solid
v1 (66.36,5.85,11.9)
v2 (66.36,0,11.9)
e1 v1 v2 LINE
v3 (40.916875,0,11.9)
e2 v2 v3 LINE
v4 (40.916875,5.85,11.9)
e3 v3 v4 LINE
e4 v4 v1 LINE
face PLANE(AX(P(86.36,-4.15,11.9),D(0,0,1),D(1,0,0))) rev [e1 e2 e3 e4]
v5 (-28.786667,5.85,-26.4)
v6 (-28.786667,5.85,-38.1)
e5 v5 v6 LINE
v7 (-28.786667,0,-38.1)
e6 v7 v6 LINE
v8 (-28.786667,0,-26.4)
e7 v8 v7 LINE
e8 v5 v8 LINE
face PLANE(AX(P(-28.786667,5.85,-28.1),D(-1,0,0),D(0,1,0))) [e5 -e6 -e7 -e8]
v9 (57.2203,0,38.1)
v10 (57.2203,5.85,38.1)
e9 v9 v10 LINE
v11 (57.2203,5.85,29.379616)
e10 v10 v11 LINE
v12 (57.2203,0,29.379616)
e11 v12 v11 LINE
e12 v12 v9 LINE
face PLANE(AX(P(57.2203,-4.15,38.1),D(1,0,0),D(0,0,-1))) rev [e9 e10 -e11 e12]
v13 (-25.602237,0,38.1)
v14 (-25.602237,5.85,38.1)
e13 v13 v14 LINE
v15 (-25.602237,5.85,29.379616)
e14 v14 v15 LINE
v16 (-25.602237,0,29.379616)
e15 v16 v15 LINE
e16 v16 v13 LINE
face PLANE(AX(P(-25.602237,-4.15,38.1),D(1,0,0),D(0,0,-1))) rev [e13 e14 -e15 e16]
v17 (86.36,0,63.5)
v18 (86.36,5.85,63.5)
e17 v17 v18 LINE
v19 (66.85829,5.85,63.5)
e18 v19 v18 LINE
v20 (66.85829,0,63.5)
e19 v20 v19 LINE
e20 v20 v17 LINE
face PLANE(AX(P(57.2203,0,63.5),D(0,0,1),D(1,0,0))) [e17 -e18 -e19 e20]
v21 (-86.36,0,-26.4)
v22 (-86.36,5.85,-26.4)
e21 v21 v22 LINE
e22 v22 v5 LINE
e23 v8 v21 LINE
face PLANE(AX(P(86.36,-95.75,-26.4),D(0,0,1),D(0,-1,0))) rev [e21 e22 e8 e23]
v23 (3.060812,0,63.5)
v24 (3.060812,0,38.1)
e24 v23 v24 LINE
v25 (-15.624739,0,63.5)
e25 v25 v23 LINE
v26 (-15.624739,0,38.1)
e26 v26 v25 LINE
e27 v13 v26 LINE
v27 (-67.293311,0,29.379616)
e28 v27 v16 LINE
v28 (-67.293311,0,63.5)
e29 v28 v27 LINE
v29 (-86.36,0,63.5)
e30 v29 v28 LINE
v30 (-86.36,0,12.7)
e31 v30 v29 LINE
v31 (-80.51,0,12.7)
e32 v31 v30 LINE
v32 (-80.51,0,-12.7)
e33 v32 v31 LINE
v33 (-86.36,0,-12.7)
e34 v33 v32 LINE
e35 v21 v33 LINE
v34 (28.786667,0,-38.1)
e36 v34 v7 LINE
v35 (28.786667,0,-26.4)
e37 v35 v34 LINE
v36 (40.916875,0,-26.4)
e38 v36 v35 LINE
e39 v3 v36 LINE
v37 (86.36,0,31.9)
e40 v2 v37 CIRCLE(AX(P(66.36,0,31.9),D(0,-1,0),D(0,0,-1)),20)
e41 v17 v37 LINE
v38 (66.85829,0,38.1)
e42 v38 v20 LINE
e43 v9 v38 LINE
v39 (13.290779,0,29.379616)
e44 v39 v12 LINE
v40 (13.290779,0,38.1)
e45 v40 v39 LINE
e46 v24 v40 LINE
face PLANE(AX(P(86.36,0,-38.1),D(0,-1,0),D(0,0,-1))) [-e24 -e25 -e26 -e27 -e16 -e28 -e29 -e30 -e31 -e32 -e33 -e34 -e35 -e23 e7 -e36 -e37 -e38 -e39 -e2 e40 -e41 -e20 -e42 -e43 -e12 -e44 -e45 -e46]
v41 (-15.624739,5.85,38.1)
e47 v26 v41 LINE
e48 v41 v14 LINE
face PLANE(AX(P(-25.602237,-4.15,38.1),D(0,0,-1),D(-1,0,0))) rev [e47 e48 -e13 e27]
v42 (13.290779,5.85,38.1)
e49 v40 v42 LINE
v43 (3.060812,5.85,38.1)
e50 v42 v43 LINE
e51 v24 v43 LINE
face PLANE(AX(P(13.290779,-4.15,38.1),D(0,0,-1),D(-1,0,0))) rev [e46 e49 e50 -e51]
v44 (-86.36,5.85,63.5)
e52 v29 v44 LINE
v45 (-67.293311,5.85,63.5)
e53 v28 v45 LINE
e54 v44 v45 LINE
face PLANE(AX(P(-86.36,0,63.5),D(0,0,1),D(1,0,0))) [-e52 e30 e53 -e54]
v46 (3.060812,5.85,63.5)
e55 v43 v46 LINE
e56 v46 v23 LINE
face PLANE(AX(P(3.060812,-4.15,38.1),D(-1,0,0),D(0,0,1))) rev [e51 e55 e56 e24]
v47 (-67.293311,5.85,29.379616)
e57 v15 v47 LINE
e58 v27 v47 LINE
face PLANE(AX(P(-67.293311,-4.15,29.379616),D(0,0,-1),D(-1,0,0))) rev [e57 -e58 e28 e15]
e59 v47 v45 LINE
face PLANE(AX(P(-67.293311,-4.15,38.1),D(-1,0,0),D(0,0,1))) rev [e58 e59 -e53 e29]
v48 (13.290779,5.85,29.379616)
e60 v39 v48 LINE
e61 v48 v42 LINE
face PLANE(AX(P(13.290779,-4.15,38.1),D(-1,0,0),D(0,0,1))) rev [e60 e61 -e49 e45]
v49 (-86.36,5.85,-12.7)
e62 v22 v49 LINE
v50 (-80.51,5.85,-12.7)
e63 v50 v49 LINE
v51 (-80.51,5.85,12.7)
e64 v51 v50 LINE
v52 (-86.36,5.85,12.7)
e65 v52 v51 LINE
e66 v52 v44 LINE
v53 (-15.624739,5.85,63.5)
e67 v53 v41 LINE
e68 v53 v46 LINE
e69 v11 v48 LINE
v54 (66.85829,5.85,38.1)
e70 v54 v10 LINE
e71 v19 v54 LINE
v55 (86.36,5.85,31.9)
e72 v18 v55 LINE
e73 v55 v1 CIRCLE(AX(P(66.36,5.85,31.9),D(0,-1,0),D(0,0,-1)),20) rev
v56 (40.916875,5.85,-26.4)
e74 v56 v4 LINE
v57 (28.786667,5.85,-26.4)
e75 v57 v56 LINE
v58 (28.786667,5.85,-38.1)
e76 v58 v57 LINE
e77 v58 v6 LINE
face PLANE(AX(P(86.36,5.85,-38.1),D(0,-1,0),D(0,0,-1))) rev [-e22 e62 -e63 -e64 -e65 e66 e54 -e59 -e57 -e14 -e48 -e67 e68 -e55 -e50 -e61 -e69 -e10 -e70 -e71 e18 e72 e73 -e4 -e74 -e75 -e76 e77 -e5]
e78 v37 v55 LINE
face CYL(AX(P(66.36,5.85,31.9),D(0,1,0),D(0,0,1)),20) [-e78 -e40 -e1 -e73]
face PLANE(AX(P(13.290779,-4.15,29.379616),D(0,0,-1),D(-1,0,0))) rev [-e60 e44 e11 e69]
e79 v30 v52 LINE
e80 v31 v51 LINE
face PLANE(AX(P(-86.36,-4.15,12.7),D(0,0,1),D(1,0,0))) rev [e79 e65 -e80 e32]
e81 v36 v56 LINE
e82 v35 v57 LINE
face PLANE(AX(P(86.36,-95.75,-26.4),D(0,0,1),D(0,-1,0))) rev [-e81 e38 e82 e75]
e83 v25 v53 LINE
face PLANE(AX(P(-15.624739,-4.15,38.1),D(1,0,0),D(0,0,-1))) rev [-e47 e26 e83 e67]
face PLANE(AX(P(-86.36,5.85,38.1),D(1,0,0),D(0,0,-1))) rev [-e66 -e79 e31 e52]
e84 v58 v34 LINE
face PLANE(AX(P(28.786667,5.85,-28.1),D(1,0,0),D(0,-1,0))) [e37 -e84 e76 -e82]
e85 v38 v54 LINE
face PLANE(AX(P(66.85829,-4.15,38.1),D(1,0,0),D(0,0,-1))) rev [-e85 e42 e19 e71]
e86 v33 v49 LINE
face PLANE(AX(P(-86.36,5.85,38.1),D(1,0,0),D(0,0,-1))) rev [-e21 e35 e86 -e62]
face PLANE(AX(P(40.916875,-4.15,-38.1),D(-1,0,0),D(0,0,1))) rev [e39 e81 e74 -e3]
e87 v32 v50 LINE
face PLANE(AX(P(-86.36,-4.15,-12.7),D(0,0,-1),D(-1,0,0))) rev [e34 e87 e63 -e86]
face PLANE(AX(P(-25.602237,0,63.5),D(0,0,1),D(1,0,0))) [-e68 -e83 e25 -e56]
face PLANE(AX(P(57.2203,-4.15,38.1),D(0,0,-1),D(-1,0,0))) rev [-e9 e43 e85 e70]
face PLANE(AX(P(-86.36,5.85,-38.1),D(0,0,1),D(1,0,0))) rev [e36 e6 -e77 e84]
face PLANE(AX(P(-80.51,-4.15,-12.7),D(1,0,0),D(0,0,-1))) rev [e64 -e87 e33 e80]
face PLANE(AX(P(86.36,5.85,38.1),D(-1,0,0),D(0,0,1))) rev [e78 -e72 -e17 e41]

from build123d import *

# Parameters (mm, degrees)
SKETCH1_W             = 172.72
SKETCH1_H             = 76.2
BOSS_EXTRUDE1_DEPTH   = 5.85
SKETCH2_W             = 5.85
SKETCH2_H             = 25.4
SKETCH2_W_2           = 41.691074393
SKETCH2_H_2           = 8.720383817
SKETCH2_W_3           = 43.92952134
SKETCH2_W_4           = 45.443124842
SKETCH2_H_3           = 50
CUT_EXTRUDE1_DEPTH    = 10
SKETCH3_W             = 29.139699911
SKETCH3_H             = 25.4
BOSS_EXTRUDE2_DEPTH   = 5.85
SKETCH3_W_2           = 38.893015708
BOSS_EXTRUDE2_2_DEPTH = 5.85
SKETCH3_W_3           = 19.066688648
BOSS_EXTRUDE2_3_DEPTH = 5.85
SKETCH4_W             = 9.977498033
SKETCH4_H             = 25.4
SKETCH4_W_2           = 10.229966749
SKETCH4_W_3           = 9.637990001
CUT_EXTRUDE2_DEPTH    = 10
CAVITY1_START         = -38.1
CAVITY1_OUTLINE_W     = 12.130208491
CAVITY1_OUTLINE_H     = 5.85
CAVITY1_OUTLINE_W_2   = 57.573333333
CAVITY1_DEPTH         = 11.7
FILLET2_R             = 20


# Read off the part's stored shape, not the designer's step: Cavity1
with BuildPart() as part:
    # Sketch1 → Boss-Extrude1 (new body)
    with BuildSketch(Plane(origin=(0, 0, 0), x_dir=(1, 0, 0), z_dir=(0, 1, 0))):
        Rectangle(SKETCH1_W, SKETCH1_H)
    extrude(amount=BOSS_EXTRUDE1_DEPTH)

    # Sketch2 → Cut-Extrude1 (cut)
    with BuildSketch(Plane(origin=(0, 5.85, 0), x_dir=(1, 0, 0), z_dir=(0, 1, 0))):
        with Locations((-83.435, 0)):
            Rectangle(SKETCH2_W, SKETCH2_H)
        with Locations((-46.447774155, -33.739808092)):
            Rectangle(SKETCH2_W_2, SKETCH2_H_2)
        with Locations((35.255539419, -33.739808092)):
            Rectangle(SKETCH2_W_3, SKETCH2_H_2)
        with Locations((63.638437579, 13.1)):
            Rectangle(SKETCH2_W_4, SKETCH2_H_3)
    extrude(amount=-CUT_EXTRUDE1_DEPTH, mode=Mode.SUBTRACT)


with BuildPart() as body_2:
    # Sketch3 → Boss-Extrude2 (new body)
    with BuildSketch(Plane(origin=(0, 5.85, 0), x_dir=(-1, 0, 0), z_dir=(0, 1, 0))):
        with Locations((-71.790150044, 50.8)):
            Rectangle(SKETCH3_W, SKETCH3_H)
    extrude(amount=-BOSS_EXTRUDE2_DEPTH)


with BuildPart() as body_3:
    # Sketch3 → Boss-Extrude2 2 (new body)
    with BuildSketch(Plane(origin=(0, 5.85, 0), x_dir=(-1, 0, 0), z_dir=(0, 1, 0))):
        with Locations((6.155729105, 50.8)):
            Rectangle(SKETCH3_W_2, SKETCH3_H)
    extrude(amount=-BOSS_EXTRUDE2_2_DEPTH)


with BuildPart() as body_4:
    # Sketch3 → Boss-Extrude2 3 (new body)
    with BuildSketch(Plane(origin=(0, 5.85, 0), x_dir=(-1, 0, 0), z_dir=(0, 1, 0))):
        with Locations((76.826655676, 50.8)):
            Rectangle(SKETCH3_W_3, SKETCH3_H)
    extrude(amount=-BOSS_EXTRUDE2_3_DEPTH)


with BuildPart() as part_1:
    add(part.part)

    # Combine1: union body 4, body 3, body 2
    add(body_4.part)
    add(body_3.part)
    add(body_2.part)

    # Sketch4 → Cut-Extrude2 (cut)
    with BuildSketch(Plane(origin=(0, 5.85, 0), x_dir=(1, 0, 0), z_dir=(0, 1, 0))):
        with Locations((-20.613487943, -50.8)):
            Rectangle(SKETCH4_W, SKETCH4_H)
        with Locations((8.175795375, -50.8)):
            Rectangle(SKETCH4_W_2, SKETCH4_H)
        with Locations((62.03929509, -50.8)):
            Rectangle(SKETCH4_W_3, SKETCH4_H)
    extrude(amount=-CUT_EXTRUDE2_DEPTH, mode=Mode.SUBTRACT)

    # Cavity1 outline → Cavity1 (cut)
    with BuildSketch(Plane.XY.offset(CAVITY1_START)):
        with Locations((34.851770913, 2.925)):
            Rectangle(CAVITY1_OUTLINE_W, CAVITY1_OUTLINE_H)
        with Locations((-57.573333334, 2.925)):
            Rectangle(CAVITY1_OUTLINE_W_2, CAVITY1_OUTLINE_H)
    extrude(amount=CAVITY1_DEPTH, mode=Mode.SUBTRACT)

    # Fillet2
    fillet2_edges = [part_1.edges().sort_by_distance(p)[0] for p in [
        (86.36, 2.925, 11.9),
    ]]
    fillet(fillet2_edges, radius=FILLET2_R)


solid = part_1.part
